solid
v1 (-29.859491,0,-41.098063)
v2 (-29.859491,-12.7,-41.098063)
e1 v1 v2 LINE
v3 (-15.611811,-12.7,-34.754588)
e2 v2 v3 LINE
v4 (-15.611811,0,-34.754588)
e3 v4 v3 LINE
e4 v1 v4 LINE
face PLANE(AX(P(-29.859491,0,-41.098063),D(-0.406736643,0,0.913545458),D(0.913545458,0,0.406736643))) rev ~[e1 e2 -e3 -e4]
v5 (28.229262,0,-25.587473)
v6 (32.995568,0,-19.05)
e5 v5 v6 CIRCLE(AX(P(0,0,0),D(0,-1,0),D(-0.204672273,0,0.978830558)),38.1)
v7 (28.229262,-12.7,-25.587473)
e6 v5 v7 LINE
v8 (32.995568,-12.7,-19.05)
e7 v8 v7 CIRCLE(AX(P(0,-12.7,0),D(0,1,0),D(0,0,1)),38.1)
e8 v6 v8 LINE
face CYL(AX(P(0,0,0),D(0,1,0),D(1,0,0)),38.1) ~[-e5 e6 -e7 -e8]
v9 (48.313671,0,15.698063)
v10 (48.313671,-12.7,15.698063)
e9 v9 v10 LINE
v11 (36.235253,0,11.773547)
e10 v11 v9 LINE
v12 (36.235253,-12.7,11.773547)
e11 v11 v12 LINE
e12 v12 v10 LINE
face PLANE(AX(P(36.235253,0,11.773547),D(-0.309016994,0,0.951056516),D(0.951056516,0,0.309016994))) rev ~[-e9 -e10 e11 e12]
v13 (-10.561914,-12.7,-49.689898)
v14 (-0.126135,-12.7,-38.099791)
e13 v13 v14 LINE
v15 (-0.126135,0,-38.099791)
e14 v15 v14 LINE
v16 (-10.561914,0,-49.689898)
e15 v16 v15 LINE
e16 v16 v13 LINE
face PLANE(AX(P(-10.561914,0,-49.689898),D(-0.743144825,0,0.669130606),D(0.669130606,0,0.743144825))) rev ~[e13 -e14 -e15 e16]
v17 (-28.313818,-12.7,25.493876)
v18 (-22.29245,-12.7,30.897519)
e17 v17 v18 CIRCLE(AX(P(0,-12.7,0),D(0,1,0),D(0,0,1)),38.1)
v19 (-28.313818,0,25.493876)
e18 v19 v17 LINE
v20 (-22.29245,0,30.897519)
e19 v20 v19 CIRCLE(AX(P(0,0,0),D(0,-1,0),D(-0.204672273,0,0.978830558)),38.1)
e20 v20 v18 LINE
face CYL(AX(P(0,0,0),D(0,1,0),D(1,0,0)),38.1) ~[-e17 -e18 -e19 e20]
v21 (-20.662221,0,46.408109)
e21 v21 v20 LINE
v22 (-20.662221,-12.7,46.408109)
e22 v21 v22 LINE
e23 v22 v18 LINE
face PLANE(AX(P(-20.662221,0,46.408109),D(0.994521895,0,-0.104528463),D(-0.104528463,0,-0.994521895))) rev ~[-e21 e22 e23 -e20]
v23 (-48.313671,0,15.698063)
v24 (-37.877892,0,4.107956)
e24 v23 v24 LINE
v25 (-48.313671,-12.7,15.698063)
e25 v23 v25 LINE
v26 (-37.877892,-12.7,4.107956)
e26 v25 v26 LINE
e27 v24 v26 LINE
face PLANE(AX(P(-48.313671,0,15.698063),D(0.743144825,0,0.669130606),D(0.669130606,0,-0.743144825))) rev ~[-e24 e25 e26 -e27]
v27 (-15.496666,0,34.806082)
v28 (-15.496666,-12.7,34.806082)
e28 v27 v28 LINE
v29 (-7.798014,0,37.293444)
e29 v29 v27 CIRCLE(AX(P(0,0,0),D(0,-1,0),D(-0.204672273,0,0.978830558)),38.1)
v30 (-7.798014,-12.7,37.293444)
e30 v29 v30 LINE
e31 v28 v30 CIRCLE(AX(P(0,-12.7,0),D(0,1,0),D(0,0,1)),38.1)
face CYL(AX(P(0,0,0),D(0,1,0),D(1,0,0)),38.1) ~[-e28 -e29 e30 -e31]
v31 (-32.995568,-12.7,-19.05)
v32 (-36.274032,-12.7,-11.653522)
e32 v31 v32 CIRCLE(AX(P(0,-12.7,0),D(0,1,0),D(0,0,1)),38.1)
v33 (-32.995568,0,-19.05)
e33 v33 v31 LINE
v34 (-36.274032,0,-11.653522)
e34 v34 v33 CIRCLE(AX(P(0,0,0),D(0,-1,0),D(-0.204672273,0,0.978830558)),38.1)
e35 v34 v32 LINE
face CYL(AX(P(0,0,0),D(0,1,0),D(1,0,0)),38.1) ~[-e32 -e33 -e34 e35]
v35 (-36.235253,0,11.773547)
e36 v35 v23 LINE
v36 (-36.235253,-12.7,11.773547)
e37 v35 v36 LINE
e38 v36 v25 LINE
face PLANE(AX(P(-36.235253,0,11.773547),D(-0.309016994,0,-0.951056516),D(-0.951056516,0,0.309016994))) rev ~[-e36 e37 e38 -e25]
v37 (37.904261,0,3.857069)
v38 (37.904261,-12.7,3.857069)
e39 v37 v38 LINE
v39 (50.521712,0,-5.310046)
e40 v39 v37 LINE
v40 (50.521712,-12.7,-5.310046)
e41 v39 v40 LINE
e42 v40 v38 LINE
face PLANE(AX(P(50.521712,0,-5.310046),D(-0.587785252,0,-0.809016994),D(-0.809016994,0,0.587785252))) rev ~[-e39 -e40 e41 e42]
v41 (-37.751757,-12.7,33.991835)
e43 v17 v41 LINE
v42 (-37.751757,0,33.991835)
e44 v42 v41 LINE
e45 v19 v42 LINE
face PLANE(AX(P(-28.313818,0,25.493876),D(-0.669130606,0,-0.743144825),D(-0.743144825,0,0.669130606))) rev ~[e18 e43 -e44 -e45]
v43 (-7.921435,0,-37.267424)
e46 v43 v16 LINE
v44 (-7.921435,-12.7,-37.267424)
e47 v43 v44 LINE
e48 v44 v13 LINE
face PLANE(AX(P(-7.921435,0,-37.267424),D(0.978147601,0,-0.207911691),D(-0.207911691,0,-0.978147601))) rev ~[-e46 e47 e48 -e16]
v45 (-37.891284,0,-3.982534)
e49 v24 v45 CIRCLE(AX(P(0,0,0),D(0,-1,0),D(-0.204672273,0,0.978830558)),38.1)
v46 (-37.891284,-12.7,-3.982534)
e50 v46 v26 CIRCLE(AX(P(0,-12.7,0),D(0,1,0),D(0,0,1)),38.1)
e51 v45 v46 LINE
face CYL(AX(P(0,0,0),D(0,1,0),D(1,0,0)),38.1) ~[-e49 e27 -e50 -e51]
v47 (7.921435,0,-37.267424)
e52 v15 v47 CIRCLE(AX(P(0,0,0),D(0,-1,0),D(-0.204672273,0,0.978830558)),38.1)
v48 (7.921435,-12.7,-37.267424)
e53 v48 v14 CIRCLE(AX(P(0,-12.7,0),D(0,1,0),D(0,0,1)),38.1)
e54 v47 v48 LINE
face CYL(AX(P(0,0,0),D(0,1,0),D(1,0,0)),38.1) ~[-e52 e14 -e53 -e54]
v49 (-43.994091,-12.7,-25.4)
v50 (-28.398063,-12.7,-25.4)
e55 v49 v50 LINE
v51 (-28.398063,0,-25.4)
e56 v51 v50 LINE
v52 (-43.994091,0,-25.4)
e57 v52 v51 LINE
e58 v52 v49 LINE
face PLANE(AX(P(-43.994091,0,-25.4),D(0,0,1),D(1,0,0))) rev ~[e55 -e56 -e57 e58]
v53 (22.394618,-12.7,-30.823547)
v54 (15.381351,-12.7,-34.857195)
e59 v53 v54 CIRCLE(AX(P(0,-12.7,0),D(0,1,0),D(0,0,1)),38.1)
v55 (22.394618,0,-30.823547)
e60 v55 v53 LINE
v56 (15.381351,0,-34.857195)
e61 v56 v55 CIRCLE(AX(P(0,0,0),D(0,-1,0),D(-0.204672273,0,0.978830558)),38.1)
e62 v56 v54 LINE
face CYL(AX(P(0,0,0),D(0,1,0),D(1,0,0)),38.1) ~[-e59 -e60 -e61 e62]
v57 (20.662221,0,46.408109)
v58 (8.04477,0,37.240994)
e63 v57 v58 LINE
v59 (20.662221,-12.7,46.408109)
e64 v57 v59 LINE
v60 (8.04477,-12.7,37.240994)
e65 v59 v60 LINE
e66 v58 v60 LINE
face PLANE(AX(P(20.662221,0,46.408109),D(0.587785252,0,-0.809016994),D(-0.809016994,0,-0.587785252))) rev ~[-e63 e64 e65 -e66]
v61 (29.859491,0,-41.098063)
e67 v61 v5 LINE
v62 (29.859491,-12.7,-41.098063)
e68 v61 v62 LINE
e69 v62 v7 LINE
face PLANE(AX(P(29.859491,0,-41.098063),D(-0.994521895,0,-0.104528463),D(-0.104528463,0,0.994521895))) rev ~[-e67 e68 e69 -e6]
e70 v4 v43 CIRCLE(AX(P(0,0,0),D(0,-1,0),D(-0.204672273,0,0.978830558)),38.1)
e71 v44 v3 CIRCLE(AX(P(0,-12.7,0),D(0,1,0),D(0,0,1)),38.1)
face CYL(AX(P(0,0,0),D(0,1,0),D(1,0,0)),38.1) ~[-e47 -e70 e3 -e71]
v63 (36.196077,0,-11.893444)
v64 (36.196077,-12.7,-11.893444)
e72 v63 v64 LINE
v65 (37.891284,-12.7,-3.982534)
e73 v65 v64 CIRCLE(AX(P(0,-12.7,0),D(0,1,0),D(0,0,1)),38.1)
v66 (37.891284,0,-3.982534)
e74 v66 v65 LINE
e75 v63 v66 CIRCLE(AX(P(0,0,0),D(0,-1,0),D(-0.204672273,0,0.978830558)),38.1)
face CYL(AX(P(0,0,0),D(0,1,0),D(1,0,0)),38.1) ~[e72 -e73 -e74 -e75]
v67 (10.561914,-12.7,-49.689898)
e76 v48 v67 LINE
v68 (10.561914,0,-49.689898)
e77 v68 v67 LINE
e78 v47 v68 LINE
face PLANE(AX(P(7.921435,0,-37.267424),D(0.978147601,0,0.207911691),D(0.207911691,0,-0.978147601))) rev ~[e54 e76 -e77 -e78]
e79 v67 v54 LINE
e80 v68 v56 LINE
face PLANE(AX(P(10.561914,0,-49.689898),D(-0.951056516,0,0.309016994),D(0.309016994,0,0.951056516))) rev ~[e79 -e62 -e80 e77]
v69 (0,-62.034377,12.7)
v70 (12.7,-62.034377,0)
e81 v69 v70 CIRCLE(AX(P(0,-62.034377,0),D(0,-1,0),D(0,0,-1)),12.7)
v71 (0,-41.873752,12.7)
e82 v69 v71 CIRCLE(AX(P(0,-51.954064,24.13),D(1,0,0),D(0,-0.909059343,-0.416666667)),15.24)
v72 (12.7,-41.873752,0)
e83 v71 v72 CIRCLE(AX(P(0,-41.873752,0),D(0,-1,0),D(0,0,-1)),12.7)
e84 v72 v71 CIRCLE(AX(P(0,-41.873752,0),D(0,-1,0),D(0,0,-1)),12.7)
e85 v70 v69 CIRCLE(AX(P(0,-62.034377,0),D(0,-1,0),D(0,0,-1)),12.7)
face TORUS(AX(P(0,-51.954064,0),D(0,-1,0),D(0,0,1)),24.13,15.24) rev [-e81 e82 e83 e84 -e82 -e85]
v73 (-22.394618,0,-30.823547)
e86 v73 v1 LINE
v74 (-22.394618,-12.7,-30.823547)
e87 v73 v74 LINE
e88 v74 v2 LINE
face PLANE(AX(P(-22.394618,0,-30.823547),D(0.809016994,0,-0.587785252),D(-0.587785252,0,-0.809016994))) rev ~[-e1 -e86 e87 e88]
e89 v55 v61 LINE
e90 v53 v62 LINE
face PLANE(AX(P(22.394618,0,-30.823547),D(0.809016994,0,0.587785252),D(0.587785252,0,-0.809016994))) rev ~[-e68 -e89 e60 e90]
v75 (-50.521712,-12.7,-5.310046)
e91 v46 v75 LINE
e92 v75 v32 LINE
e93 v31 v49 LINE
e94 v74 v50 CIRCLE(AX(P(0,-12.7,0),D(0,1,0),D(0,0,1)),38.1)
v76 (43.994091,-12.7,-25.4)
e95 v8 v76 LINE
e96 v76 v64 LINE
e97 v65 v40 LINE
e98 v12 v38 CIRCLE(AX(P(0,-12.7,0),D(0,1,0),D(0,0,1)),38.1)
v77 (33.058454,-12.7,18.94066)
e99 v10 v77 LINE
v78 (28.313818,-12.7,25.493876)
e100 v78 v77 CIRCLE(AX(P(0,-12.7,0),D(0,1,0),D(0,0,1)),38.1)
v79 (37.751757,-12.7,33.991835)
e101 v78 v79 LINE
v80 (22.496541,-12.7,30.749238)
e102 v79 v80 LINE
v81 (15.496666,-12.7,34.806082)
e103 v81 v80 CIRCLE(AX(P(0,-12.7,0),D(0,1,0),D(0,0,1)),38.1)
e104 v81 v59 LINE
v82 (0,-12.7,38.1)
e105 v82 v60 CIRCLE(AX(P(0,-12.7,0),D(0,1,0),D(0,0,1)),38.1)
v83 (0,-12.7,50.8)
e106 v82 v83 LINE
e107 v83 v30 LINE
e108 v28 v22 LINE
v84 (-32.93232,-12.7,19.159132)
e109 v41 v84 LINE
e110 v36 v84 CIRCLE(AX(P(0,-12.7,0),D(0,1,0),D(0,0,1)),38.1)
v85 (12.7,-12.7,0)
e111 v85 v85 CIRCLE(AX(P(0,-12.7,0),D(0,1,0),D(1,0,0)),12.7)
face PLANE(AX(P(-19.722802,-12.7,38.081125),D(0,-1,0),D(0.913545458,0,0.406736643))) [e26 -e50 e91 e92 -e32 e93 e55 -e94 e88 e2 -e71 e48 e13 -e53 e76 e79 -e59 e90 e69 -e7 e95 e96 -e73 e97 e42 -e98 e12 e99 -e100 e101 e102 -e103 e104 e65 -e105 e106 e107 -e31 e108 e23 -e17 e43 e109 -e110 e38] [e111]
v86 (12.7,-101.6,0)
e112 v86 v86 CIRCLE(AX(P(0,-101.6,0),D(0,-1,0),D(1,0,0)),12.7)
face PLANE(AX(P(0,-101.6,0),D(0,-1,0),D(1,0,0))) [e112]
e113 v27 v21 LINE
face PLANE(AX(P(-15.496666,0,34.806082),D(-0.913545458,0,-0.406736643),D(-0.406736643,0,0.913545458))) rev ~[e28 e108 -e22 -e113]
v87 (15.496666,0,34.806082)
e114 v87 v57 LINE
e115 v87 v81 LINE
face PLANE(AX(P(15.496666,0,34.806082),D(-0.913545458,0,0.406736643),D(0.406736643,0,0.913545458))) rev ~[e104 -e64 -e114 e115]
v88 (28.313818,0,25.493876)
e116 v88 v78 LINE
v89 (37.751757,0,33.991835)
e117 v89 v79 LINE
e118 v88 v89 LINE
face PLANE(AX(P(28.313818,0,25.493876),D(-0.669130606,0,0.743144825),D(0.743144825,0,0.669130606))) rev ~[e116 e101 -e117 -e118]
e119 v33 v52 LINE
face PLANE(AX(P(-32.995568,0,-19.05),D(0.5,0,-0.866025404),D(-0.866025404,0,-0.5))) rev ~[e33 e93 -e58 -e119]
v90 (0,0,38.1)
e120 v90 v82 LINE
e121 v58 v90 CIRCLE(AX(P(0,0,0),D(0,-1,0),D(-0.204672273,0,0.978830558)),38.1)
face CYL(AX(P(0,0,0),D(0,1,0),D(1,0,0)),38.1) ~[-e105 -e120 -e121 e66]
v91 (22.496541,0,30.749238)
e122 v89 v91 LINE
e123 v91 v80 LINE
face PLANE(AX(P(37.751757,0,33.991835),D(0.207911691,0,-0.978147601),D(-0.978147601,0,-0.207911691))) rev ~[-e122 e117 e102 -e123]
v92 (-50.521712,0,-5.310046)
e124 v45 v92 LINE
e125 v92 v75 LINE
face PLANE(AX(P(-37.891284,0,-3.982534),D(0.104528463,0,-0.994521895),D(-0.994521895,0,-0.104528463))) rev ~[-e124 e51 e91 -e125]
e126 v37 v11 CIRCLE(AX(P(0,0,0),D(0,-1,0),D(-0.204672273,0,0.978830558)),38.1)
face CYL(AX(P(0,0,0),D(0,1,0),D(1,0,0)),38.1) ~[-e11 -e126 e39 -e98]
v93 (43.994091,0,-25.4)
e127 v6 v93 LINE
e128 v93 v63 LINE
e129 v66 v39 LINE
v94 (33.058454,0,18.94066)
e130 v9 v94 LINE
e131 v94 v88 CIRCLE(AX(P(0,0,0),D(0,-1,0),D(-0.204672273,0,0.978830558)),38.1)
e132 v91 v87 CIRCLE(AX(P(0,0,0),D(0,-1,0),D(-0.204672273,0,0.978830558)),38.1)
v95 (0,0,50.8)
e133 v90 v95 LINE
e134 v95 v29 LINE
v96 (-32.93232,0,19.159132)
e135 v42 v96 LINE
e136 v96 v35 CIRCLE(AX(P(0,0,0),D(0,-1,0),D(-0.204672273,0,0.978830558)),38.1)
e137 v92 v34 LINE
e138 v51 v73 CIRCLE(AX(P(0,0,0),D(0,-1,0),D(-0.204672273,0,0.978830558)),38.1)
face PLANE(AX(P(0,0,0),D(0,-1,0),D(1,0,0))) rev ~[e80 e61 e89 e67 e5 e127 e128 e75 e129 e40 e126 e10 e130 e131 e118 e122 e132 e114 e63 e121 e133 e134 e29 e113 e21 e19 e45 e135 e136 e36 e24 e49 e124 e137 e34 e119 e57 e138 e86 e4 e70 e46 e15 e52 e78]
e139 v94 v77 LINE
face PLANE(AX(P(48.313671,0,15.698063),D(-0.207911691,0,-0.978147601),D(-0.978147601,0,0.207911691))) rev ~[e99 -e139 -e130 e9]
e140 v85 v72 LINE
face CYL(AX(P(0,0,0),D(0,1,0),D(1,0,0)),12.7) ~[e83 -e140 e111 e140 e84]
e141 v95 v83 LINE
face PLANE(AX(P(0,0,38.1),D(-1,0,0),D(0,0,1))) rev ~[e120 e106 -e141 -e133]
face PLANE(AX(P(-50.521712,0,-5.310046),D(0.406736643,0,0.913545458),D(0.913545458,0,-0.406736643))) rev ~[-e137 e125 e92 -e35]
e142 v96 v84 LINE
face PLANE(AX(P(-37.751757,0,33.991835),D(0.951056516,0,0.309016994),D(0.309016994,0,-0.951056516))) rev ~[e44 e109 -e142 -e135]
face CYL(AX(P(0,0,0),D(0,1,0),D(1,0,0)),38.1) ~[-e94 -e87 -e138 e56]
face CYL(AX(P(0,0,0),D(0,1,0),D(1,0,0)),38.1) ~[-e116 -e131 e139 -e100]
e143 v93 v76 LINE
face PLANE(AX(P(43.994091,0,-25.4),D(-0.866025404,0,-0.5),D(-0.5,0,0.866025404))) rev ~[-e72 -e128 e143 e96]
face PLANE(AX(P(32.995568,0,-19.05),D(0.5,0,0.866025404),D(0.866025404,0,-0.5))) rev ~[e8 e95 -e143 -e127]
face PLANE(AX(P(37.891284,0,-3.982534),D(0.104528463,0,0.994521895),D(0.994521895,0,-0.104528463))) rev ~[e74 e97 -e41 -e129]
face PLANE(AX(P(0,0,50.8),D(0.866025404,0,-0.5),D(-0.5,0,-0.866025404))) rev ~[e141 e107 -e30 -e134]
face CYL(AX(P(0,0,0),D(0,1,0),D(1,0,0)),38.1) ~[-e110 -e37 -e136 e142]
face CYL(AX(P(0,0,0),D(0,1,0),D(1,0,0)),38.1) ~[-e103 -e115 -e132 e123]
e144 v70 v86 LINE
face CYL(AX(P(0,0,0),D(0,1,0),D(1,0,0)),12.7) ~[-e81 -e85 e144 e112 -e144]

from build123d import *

# Parameters (mm, degrees)
F0_R            = 38.1
F1_DEPTH        = 12.7
F3_DEPTH        = 12.7
F3_COPIES_COUNT = 15
F4_R            = 12.7
F5_DEPTH        = 101.6


# Not quite as in the source:
# - a pattern or mirror of a feature is missing from the dataset's text; its kind, count and spacing are read off the source's solid


with BuildPart() as f1:
    # F0 (on Front) → F1 (new body)
    with BuildSketch(Plane.XZ):
        Circle(F0_R)
    extrude(amount=F1_DEPTH)

    # F2 (on Front) → F3 (join, through all)
    with BuildSketch(Plane.XZ):
        Polygon((0, 50.8), (-7.798013599, 37.2934442484), (0, 38.1), align=None)
    f3 = extrude(amount=F3_DEPTH)

    # F3_copies: F3 ×15 about axis
    f3_copies_axis = Axis((0, 0, 0), (0, 1, 0))
    for i in range(1, F3_COPIES_COUNT):
        add(f3.rotate(f3_copies_axis, i * 360 / F3_COPIES_COUNT))

    # F4 (on Front) → F5 (join)
    with BuildSketch(Plane.XZ):
        Circle(F4_R)
    extrude(amount=F5_DEPTH)

    # F6 (on Right) → F7 (revolve, cut)
    with BuildSketch(Plane.YZ):
        with BuildLine():
            Line((-38.1, 17.78), (-65.8081287712, 17.78))
            ThreePointArc((-65.8081287712, 17.78), (-51.9540643856, 8.89), (-38.1, 17.78))
        make_face()
    revolve(axis=Axis((0, 0, 0), (0, 1, 0)), mode=Mode.SUBTRACT)


solid = f1.part
